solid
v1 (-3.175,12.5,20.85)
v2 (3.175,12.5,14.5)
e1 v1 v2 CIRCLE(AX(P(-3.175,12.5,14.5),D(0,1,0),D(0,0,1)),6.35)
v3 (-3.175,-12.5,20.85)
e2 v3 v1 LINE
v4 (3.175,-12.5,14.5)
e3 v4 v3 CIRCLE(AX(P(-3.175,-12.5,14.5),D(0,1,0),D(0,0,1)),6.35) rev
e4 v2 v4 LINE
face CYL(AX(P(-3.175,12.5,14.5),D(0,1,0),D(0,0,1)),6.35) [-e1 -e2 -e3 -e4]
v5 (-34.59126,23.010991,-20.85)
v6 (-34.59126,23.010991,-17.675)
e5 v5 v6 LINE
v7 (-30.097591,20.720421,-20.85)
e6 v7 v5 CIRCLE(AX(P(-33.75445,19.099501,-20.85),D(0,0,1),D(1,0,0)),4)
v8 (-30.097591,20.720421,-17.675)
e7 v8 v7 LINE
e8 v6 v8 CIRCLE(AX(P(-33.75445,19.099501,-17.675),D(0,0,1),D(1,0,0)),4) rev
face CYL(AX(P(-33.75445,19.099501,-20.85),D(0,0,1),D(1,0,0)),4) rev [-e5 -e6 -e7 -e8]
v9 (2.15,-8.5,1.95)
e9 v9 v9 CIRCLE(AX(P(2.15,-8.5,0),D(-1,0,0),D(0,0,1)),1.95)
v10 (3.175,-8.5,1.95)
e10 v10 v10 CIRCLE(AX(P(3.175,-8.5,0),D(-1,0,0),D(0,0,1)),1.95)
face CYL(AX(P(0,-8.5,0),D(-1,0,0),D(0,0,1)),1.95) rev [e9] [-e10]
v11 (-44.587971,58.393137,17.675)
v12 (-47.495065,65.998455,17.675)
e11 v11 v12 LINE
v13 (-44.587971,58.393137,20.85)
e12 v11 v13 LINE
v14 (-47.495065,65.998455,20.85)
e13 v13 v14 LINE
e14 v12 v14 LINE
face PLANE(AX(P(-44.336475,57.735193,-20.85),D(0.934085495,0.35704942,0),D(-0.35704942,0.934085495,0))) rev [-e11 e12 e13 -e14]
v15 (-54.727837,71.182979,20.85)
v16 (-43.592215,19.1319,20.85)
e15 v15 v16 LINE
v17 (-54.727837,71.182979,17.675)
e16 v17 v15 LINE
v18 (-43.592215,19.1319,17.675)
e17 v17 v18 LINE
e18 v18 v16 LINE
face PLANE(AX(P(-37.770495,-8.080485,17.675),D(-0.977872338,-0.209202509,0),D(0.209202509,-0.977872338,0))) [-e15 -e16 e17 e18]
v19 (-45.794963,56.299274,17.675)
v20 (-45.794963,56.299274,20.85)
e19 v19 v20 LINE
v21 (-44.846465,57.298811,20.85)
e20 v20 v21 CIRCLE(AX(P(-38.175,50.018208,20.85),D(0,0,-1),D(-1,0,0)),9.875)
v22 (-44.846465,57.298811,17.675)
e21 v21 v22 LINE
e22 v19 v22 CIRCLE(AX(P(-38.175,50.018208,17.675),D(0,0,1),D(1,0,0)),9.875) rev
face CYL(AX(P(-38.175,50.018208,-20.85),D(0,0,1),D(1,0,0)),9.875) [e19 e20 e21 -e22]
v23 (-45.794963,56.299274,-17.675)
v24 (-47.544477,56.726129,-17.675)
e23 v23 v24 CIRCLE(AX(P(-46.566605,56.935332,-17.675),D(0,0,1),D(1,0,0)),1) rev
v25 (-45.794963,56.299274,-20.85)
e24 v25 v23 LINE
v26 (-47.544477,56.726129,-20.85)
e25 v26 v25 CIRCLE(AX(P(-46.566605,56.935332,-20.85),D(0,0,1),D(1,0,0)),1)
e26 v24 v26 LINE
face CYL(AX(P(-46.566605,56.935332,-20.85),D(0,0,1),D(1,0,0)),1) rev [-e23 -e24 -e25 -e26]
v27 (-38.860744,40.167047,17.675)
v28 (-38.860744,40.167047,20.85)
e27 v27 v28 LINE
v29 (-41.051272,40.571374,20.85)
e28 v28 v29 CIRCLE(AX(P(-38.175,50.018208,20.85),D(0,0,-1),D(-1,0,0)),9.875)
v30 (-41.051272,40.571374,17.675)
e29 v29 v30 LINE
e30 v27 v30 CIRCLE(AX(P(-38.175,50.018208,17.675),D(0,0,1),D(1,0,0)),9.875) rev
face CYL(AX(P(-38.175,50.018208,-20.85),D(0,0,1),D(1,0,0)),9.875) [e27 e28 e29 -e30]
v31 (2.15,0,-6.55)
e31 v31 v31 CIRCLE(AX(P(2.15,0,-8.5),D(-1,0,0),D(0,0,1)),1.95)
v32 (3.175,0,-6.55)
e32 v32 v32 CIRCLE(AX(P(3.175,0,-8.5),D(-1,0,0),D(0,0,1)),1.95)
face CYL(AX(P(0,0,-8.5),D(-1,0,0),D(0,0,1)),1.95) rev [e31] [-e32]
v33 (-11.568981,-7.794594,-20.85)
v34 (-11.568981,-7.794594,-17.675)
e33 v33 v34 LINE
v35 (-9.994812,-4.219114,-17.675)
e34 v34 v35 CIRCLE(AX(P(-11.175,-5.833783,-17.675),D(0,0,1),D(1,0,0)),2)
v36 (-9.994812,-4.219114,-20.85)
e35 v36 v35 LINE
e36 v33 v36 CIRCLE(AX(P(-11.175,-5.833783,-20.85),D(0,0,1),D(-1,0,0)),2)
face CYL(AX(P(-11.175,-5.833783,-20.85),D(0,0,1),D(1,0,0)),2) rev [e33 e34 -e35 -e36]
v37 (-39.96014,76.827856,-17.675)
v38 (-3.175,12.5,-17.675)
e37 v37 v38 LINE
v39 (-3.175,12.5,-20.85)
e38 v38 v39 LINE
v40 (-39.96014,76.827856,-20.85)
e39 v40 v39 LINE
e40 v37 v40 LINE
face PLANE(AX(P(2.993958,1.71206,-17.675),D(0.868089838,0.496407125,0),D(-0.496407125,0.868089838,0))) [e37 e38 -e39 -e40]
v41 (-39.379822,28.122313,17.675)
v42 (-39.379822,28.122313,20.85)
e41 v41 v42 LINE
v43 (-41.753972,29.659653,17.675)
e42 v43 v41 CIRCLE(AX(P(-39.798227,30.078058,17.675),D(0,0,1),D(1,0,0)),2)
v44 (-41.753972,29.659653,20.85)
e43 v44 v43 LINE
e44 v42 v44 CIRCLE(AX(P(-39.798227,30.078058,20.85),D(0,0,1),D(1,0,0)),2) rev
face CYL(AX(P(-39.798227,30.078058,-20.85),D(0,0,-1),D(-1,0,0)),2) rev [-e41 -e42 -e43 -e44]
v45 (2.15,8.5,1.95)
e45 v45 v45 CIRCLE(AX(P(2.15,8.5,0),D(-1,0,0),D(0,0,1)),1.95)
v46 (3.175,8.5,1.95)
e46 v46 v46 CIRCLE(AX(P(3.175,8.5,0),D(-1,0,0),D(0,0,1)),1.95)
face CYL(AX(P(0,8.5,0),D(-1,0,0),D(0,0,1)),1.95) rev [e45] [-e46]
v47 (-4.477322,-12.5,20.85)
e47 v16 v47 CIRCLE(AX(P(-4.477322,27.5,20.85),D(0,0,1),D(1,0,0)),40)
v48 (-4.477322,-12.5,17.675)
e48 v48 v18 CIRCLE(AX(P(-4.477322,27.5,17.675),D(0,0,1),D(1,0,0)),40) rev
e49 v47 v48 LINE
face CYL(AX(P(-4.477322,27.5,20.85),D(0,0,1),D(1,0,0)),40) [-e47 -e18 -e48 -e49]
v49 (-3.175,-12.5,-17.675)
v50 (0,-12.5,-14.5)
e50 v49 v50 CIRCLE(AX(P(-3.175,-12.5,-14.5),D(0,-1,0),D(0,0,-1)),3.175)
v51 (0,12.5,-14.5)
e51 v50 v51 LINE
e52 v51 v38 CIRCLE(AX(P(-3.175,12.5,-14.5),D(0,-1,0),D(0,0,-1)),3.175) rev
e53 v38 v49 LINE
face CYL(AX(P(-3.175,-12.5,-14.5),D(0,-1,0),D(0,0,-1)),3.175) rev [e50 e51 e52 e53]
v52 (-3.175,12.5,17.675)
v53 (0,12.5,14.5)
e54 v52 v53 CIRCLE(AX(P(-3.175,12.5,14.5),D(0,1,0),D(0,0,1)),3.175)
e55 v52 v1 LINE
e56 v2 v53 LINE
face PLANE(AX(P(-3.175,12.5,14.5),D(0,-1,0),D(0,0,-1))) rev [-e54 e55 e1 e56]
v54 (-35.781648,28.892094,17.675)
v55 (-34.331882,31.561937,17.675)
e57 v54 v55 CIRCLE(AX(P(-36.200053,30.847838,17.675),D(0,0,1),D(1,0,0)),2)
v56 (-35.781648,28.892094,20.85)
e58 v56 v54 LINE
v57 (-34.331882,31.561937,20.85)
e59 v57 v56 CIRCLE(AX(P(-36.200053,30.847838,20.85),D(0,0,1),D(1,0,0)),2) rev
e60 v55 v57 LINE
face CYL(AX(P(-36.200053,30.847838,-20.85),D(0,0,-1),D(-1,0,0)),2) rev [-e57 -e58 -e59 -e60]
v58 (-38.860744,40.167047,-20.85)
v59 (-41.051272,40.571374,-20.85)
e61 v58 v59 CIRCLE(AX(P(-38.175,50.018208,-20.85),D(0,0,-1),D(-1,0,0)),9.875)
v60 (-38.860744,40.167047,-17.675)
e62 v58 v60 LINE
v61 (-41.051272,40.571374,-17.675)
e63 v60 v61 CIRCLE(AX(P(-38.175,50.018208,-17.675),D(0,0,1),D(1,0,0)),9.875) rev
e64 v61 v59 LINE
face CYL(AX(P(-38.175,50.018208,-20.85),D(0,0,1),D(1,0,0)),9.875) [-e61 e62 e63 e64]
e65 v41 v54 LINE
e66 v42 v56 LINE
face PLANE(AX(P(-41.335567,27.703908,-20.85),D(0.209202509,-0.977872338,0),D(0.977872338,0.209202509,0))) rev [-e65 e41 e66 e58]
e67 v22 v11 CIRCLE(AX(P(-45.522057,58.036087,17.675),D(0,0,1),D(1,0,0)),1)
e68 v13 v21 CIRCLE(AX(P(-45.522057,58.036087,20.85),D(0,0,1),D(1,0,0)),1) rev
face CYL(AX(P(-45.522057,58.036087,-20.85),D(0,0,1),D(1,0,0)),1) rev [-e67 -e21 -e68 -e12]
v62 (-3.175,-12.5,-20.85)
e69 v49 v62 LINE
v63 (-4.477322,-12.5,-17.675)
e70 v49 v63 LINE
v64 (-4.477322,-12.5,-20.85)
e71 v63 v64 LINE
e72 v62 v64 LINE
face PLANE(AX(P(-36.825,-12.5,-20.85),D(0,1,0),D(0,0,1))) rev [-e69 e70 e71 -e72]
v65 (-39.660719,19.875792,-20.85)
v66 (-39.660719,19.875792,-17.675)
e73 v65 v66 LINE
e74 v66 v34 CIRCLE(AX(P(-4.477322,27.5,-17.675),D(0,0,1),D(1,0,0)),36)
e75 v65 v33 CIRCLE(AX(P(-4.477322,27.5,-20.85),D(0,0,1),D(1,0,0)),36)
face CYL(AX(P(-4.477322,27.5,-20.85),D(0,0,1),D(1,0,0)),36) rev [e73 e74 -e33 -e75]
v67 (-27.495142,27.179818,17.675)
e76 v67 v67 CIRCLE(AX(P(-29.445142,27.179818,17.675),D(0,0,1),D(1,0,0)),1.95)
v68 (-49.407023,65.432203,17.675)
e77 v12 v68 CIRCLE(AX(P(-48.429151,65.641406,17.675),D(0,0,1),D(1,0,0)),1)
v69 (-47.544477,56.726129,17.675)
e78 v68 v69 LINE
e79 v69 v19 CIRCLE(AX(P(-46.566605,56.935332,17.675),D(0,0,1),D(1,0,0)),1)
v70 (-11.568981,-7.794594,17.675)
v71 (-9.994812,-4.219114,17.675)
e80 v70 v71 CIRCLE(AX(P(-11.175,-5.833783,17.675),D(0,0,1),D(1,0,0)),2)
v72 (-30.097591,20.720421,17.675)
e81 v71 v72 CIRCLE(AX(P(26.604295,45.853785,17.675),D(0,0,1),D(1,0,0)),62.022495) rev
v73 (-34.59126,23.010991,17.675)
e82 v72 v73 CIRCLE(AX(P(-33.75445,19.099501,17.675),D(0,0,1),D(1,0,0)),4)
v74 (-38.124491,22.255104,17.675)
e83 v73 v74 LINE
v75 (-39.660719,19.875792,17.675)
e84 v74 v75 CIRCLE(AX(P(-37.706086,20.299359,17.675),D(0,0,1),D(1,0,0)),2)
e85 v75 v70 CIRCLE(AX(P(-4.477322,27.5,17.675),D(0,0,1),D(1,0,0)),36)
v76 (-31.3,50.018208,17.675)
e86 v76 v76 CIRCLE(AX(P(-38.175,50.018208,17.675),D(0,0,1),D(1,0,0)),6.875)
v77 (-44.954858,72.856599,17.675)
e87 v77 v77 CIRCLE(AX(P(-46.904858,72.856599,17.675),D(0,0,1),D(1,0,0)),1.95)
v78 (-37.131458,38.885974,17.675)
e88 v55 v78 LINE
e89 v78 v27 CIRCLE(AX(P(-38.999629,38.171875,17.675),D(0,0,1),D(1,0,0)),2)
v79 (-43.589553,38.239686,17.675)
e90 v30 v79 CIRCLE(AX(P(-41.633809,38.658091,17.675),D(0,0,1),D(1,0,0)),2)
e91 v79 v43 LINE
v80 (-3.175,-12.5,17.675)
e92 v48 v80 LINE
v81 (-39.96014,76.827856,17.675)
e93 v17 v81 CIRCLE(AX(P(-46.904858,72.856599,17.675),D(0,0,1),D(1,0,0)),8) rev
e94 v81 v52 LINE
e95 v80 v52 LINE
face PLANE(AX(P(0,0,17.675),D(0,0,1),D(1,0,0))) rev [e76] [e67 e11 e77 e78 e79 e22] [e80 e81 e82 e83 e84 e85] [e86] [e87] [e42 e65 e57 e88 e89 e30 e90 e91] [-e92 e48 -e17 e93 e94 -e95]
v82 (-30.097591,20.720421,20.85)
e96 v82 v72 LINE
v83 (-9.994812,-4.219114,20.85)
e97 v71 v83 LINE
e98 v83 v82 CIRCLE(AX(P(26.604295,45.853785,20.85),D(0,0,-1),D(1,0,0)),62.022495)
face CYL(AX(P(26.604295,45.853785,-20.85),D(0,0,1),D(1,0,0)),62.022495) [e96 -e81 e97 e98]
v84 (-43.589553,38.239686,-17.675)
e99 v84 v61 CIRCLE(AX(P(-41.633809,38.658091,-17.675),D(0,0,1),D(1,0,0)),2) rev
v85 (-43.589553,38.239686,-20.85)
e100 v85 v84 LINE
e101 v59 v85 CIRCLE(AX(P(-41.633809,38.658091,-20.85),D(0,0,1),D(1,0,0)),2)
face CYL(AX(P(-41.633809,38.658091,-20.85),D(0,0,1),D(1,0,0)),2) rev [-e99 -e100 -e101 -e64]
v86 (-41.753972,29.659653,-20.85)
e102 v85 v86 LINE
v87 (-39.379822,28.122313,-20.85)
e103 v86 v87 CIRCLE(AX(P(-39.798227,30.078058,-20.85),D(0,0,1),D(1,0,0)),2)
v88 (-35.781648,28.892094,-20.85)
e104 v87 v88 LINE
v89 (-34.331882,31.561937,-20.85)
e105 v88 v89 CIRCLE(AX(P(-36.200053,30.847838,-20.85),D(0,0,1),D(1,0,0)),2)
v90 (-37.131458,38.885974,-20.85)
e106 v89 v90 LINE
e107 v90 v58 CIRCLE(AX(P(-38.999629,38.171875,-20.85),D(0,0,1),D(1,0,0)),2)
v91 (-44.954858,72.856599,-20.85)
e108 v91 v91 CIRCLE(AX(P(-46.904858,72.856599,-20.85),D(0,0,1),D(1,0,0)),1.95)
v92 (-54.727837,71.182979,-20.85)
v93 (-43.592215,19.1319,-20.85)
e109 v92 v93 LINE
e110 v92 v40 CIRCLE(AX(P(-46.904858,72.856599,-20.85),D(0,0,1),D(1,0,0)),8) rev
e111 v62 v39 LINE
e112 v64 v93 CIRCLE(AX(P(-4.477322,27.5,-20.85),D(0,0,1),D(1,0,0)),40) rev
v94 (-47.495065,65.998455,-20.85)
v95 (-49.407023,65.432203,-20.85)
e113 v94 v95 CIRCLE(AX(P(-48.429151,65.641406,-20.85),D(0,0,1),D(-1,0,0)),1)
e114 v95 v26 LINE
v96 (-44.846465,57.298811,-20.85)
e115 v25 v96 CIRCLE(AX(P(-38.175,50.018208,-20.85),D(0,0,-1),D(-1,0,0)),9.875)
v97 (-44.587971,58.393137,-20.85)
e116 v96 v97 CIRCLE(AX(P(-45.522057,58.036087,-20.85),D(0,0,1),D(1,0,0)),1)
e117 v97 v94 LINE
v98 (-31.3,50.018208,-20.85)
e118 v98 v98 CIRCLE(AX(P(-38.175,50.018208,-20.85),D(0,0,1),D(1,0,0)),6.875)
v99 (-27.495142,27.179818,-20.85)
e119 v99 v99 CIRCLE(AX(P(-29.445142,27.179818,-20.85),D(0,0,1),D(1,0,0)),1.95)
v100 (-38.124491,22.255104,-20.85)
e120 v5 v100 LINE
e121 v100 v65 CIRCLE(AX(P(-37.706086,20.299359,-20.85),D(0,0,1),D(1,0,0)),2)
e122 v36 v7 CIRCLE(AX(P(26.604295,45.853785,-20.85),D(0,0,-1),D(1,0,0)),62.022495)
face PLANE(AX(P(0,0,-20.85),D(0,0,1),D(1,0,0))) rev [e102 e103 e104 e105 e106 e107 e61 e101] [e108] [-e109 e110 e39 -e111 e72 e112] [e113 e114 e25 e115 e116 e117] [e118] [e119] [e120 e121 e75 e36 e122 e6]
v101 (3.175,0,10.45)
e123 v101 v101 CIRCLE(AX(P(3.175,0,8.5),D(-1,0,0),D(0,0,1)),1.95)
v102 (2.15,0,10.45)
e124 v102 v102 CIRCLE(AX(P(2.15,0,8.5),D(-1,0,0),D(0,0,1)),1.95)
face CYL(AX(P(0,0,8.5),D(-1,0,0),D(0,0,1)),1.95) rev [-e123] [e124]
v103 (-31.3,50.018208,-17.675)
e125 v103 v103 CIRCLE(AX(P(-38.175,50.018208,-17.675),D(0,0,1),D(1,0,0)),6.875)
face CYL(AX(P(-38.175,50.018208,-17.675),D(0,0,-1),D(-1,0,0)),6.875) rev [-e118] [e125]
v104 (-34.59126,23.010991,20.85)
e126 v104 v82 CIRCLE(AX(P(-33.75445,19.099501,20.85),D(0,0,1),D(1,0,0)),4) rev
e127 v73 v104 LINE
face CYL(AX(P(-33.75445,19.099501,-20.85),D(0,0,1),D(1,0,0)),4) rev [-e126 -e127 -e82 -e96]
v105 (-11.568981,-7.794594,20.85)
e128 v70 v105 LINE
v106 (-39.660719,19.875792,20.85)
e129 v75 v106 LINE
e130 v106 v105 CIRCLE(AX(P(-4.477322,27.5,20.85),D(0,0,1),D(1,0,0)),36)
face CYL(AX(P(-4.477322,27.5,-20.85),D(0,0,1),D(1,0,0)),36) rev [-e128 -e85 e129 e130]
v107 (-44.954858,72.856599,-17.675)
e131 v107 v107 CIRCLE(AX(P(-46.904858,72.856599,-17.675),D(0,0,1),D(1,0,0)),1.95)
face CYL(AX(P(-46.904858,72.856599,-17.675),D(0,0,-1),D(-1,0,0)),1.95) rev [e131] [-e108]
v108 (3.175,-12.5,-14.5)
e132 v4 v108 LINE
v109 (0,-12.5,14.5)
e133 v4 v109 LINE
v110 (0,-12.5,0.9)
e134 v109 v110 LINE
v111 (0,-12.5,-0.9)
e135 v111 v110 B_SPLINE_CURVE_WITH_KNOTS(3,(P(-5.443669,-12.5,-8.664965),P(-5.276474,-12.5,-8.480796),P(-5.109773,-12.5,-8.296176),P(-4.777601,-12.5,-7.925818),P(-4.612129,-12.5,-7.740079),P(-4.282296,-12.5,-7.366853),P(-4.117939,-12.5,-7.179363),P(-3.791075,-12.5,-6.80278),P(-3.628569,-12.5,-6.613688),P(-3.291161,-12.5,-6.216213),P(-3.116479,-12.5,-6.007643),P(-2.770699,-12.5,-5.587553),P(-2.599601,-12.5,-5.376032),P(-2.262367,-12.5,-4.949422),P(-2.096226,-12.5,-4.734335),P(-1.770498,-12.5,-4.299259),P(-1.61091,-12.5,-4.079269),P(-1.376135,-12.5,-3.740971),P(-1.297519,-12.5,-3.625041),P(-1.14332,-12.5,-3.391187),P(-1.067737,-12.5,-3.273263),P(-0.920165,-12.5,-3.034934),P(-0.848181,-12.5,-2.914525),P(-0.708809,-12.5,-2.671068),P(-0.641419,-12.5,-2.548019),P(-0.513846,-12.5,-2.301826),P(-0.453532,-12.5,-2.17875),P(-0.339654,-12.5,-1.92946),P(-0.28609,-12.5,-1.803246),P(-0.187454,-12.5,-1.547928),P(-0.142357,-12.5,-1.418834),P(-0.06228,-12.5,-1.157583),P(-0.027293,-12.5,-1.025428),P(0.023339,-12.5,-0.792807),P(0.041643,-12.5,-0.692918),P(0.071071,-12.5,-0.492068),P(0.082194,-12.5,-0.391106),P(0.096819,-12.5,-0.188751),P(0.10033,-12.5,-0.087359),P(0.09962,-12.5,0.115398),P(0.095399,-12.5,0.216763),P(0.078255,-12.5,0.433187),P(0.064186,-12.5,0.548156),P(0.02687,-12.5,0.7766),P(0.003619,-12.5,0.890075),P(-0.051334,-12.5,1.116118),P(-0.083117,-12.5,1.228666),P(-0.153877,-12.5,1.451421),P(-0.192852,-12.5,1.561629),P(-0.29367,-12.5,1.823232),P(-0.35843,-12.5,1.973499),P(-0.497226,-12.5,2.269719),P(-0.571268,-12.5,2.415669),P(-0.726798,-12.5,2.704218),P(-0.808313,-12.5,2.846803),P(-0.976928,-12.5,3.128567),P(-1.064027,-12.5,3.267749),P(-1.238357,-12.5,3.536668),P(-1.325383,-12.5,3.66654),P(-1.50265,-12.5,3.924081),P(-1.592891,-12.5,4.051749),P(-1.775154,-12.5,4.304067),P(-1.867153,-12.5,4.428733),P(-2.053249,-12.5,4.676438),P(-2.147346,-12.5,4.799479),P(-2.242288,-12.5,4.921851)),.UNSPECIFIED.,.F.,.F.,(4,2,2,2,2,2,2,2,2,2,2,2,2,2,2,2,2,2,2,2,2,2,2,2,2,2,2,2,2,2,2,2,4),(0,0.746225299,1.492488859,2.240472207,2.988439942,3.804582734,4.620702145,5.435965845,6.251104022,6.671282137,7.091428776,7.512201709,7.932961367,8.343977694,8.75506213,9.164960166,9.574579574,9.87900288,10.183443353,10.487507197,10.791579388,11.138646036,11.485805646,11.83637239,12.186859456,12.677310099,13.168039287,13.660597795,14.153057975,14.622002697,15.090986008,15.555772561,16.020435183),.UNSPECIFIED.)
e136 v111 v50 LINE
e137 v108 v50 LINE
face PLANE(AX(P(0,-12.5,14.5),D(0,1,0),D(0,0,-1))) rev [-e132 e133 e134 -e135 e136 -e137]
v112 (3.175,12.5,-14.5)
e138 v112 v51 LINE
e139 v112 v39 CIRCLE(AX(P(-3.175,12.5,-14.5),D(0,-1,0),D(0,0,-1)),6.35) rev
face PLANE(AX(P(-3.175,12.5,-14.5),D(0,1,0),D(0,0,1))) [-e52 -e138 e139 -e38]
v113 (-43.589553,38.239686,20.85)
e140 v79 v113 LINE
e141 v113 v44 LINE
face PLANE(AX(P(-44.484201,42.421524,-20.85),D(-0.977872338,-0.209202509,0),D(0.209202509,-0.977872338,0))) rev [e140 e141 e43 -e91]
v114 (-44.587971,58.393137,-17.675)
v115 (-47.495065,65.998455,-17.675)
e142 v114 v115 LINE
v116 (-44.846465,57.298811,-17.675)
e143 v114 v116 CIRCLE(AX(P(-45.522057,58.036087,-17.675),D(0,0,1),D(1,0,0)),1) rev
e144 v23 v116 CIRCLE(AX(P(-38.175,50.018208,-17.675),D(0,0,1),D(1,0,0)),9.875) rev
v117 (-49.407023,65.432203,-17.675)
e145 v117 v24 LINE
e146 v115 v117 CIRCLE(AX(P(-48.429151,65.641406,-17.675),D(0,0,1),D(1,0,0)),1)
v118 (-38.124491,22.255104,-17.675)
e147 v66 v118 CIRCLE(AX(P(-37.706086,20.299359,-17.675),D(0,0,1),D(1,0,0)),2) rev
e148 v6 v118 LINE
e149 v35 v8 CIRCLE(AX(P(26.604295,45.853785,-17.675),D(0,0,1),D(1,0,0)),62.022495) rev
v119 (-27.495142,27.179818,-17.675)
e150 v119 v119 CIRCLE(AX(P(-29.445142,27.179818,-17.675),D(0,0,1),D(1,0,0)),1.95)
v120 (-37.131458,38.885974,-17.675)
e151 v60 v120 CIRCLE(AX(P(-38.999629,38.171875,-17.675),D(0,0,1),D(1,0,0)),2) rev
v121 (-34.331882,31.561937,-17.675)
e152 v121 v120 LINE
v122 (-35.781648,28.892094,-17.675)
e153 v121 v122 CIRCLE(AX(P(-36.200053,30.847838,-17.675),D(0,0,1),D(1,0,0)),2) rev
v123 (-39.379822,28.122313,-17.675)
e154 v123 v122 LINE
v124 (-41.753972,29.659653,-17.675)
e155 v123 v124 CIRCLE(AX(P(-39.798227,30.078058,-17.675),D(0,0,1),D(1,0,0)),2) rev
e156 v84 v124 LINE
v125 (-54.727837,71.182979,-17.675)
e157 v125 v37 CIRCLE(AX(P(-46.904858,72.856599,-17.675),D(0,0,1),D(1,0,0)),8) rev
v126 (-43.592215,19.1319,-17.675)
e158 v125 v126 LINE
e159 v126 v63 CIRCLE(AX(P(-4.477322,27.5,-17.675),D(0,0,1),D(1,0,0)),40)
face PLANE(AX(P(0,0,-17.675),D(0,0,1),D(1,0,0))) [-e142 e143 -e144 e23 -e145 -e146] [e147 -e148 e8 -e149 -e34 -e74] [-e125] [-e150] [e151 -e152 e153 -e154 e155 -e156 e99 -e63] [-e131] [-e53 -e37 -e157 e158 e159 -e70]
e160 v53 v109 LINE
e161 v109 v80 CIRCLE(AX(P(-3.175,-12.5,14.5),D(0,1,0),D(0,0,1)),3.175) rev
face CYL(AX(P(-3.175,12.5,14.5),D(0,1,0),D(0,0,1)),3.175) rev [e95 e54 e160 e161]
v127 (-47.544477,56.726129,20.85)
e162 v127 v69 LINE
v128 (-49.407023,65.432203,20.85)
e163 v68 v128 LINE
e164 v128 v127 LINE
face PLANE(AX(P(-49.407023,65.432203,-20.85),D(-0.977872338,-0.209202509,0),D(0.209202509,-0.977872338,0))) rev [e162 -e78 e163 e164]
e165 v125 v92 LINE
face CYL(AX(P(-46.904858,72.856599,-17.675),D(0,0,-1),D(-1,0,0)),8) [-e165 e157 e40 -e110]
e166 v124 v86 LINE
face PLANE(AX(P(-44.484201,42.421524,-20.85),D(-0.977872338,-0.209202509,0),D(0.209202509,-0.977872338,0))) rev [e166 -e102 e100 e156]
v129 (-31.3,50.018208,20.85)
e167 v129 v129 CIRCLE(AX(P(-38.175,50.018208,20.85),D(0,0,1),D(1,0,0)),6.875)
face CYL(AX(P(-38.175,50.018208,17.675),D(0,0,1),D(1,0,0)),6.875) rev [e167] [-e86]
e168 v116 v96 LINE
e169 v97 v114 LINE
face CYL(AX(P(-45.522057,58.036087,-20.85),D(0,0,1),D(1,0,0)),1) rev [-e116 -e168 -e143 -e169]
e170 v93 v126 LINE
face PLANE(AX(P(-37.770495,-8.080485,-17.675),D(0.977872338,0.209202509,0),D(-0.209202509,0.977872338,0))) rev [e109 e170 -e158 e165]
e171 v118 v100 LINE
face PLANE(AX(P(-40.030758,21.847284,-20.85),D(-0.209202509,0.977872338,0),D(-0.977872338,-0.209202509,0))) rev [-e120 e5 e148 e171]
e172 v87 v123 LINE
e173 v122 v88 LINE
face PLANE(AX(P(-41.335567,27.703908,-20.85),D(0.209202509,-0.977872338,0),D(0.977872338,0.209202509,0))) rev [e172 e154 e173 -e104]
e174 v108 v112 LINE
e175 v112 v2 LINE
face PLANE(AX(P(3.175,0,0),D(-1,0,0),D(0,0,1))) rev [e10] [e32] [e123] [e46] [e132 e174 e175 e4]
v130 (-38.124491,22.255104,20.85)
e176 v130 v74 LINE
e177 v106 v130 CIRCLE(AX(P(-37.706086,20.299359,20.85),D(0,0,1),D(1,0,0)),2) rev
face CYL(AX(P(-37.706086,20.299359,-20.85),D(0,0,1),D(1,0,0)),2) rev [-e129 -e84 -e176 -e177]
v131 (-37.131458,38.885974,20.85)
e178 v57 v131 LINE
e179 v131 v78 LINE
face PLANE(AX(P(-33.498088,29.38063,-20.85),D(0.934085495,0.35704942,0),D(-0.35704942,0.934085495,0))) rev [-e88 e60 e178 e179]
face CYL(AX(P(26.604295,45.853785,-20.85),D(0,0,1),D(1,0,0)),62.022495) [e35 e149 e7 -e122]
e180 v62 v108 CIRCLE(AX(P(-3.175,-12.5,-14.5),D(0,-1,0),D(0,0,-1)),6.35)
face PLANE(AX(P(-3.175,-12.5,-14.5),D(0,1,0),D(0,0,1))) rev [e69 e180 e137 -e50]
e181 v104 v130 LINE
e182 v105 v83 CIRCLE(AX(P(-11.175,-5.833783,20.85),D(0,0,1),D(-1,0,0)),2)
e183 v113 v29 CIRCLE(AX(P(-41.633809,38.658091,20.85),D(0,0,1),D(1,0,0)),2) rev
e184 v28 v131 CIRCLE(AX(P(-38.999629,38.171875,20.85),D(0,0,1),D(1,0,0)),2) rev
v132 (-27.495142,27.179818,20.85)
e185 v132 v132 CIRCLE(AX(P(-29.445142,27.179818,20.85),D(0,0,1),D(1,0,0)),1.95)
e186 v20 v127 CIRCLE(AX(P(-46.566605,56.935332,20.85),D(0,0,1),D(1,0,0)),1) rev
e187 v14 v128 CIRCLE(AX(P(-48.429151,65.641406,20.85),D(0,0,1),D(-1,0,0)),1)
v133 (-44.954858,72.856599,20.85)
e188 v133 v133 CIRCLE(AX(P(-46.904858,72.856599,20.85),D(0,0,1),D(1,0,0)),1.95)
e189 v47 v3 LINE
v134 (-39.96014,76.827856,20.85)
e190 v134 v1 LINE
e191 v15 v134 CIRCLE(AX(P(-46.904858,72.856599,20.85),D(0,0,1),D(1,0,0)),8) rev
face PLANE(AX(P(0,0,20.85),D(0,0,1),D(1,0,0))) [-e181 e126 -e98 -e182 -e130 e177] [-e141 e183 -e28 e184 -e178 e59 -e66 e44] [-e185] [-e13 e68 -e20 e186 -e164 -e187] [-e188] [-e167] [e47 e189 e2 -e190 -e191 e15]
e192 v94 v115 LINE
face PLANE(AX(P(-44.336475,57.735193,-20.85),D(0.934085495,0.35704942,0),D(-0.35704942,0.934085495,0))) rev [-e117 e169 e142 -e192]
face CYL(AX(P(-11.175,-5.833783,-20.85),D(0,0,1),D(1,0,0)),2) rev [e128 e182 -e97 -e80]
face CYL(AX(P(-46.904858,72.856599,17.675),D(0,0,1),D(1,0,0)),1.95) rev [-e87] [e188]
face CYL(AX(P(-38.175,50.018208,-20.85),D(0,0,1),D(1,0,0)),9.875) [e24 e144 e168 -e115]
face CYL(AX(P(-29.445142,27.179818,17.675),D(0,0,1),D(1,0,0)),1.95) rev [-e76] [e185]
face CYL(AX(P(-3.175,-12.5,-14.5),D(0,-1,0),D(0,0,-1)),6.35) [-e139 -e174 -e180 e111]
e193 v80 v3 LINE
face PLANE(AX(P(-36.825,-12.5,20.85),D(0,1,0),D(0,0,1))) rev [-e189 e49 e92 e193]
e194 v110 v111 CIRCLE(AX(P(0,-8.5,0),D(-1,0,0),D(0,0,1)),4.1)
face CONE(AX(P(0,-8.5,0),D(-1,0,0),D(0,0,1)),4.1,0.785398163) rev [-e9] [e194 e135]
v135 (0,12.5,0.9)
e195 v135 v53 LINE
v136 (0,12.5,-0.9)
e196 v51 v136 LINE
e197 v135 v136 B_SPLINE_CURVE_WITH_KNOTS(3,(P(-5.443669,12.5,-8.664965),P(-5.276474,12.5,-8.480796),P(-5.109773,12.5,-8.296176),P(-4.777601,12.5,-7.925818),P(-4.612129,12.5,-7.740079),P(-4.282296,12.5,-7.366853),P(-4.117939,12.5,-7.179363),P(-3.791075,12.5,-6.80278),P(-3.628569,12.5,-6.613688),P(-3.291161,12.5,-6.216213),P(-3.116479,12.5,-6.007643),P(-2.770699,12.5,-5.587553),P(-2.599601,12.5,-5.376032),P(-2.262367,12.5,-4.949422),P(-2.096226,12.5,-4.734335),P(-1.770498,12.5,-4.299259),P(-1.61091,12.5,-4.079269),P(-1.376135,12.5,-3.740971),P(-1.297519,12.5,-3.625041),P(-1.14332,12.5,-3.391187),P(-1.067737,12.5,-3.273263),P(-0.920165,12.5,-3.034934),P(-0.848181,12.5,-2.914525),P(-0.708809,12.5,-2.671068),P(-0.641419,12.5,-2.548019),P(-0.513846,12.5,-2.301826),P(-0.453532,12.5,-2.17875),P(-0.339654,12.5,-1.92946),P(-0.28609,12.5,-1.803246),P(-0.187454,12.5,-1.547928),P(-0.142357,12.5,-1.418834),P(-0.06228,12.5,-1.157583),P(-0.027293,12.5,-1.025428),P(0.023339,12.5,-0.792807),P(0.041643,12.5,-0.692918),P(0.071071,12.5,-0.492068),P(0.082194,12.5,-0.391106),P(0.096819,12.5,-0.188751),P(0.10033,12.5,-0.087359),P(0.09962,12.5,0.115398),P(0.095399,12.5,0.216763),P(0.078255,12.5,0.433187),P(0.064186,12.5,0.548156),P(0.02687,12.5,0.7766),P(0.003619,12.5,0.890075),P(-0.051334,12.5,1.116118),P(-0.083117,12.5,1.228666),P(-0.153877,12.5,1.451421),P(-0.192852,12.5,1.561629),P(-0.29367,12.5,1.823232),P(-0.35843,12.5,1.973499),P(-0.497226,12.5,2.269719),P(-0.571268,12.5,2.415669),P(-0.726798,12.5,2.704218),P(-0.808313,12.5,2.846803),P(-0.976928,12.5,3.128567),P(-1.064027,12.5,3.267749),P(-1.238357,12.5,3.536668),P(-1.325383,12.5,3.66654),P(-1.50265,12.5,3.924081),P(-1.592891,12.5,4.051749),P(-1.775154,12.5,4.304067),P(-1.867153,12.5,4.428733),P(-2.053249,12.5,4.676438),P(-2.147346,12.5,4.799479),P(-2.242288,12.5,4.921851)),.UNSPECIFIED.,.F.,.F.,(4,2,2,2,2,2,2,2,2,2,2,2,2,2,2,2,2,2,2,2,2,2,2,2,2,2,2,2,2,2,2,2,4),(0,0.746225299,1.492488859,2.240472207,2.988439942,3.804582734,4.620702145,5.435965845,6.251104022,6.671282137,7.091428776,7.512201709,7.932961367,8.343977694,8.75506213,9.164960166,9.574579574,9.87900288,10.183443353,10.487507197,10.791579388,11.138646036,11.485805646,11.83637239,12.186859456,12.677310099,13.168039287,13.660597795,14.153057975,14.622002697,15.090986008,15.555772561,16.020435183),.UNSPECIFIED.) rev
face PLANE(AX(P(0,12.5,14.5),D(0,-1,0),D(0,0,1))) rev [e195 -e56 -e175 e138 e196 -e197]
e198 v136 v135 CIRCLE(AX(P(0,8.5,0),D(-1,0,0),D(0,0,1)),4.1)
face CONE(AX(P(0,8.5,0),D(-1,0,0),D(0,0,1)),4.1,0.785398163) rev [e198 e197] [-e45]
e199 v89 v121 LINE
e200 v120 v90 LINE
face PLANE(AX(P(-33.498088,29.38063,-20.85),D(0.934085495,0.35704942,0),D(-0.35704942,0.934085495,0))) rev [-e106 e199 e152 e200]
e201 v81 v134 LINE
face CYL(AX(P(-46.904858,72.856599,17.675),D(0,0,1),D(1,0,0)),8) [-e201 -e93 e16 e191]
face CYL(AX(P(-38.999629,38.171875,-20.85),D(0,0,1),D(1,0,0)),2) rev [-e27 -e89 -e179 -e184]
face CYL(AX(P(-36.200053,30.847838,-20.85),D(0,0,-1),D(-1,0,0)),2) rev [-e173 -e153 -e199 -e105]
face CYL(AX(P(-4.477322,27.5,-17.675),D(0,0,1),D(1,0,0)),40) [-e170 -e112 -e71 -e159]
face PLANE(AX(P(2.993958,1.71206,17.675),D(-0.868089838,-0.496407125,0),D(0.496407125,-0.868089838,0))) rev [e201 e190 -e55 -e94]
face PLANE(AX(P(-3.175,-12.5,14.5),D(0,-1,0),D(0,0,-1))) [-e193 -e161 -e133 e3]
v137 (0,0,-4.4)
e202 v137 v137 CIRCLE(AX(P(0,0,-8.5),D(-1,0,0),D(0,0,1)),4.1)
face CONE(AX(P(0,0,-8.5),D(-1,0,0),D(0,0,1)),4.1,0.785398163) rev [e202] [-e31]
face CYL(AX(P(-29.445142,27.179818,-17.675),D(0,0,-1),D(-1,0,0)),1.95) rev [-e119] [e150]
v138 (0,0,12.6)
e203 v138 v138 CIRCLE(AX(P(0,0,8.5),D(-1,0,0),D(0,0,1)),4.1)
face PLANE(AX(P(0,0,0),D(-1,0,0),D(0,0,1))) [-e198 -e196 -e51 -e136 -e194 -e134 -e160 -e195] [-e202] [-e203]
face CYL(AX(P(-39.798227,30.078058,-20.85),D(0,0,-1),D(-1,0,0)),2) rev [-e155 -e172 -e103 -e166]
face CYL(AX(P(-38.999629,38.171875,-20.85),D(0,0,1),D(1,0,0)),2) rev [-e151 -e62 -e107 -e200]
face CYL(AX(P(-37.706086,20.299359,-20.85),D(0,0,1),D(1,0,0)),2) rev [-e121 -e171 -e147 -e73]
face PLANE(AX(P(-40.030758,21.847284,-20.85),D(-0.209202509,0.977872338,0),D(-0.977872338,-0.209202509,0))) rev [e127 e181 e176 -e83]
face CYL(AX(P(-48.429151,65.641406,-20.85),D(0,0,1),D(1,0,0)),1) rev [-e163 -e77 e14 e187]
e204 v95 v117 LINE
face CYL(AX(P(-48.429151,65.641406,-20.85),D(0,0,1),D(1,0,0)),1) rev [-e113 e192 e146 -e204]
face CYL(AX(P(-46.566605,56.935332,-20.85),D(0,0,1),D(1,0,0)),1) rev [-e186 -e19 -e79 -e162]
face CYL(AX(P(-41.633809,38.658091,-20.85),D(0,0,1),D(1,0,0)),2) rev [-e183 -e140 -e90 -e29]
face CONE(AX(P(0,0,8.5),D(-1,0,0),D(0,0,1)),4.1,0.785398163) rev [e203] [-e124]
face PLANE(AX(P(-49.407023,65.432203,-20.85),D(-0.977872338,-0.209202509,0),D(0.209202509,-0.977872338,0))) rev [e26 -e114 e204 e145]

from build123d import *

# Parameters (mm, degrees)
SKETCH2_W                                      = 29
SKETCH2_H                                      = 25
BOSS_EXTRUDE1_DEPTH                            = 6.35
CONVERT_SOLID1_START                           = 3.175
CONVERT_SOLID1_OUTLINE_W                       = 25
CONVERT_SOLID1_OUTLINE_H                       = 29
CONVERT_SOLID1_DEPTH                           = 3.175
CSK_FOR_M3_5_FLAT_HEAD_MACHINE_SCREW1_AT_COUNT = 2
CSK_FOR_M3_5_FLAT_HEAD_MACHINE_SCREW1_AT_PITCH = 12.02081528
CSK_FOR_M3_5_FLAT_HEAD_MACHINE_SCREW_2_COUNT   = 2
CSK_FOR_M3_5_FLAT_HEAD_MACHINE_SCREW_2_PITCH   = 17
CSK_FOR_M3_5_FLAT_HEAD_MACHINE_SCREW_3_COUNT   = 2
CSK_FOR_M3_5_FLAT_HEAD_MACHINE_SCREW_3_PITCH   = 12.02081528
EDGE_FLANGE1_DEPTH                             = 25
EDGE_FLANGE1_BEND_DEPTH                        = 25
SKETCH23_R                                     = 1.95
SKETCH23_R_2                                   = 6.875
BOSS_EXTRUDE2_DEPTH                            = 3.175
FILLET1_R                                      = 40
SKETCH25_R                                     = 1.95
SKETCH25_R_2                                   = 6.875
CUT_EXTRUDE3_DEPTH                             = 107.260166637
FILLET2_R                                      = 2
FILLET3_R                                      = 4
FILLET4_R                                      = 1


with BuildPart() as part:
    # Sketch2 → Boss-Extrude1 (new body)
    with BuildSketch(Plane(origin=(0, 0, 0), x_dir=(0, 0, -1), z_dir=(1, 0, 0))):
        Rectangle(SKETCH2_W, SKETCH2_H)
    extrude(amount=BOSS_EXTRUDE1_DEPTH)

    # Convert-Solid1: read off the stored shape, not the designer's step
    # Convert-Solid1 outline → Convert-Solid1 (cut)
    with BuildSketch(Plane.YZ.offset(CONVERT_SOLID1_START)):
        Rectangle(CONVERT_SOLID1_OUTLINE_W, CONVERT_SOLID1_OUTLINE_H)
    extrude(amount=CONVERT_SOLID1_DEPTH, mode=Mode.SUBTRACT)

    # Sketch4 → CSK for M3.5 Flat Head Machine Screw1 (revolve, cut)
    with BuildSketch(Plane.ZX.offset(-8.5)):
        Polygon((0, 0), (0, 3.175), (1.95, 3.175), (1.95, 2.15), (4.1, 0), align=None)
    csk_for_m3_5_flat_head_machine_screw1 = revolve(axis=Axis((-6.35, -8.5, 0), (1, 0, 0)), mode=Mode.SUBTRACT)

    # CSK for M3.5 Flat Head Machine Screw1 at: CSK for M3.5 Flat Head Machine Screw1 ×2
    with Locations(*[Vector(0, 0.7071067811865476, 0.7071067811865476) * (i * CSK_FOR_M3_5_FLAT_HEAD_MACHINE_SCREW1_AT_PITCH) for i in range(1, CSK_FOR_M3_5_FLAT_HEAD_MACHINE_SCREW1_AT_COUNT)]):
        add(csk_for_m3_5_flat_head_machine_screw1, mode=Mode.SUBTRACT)

    # CSK for M3.5 Flat Head Machine Screw 2: CSK for M3.5 Flat Head Machine Screw1 ×2
    with Locations(*[(0, i * CSK_FOR_M3_5_FLAT_HEAD_MACHINE_SCREW_2_PITCH, 0) for i in range(1, CSK_FOR_M3_5_FLAT_HEAD_MACHINE_SCREW_2_COUNT)]):
        add(csk_for_m3_5_flat_head_machine_screw1, mode=Mode.SUBTRACT)

    # CSK for M3.5 Flat Head Machine Screw 3: CSK for M3.5 Flat Head Machine Screw1 ×2
    with Locations(*[Vector(0, 0.7071067811865476, -0.7071067811865476) * (i * CSK_FOR_M3_5_FLAT_HEAD_MACHINE_SCREW_3_PITCH) for i in range(1, CSK_FOR_M3_5_FLAT_HEAD_MACHINE_SCREW_3_COUNT)]):
        add(csk_for_m3_5_flat_head_machine_screw1, mode=Mode.SUBTRACT)

    # Edge-Flange1: sheet metal written as solids
    # Edge-Flange1 section (on a plane across the edge) → Edge-Flange1 (add)
    with BuildSketch(Plane(origin=(0, 12.5, -17.675), x_dir=(0, 0, 1), z_dir=(0, -1, 0))):
        with BuildLine():
            Line((-3.175, 3.175), (-3.175, 36.825))
            Line((-3.175, 36.825), (0, 36.825))
            Line((0, 36.825), (0, 3.175))
            ThreePointArc((0, 3.175), (0.92993597, 0.92993597), (3.175, 0))
            Line((3.175, 0), (3.175, -3.175))
            ThreePointArc((3.175, -3.175), (-1.315128061, -1.315128061), (-3.175, 3.175))
        make_face()
    extrude(amount=EDGE_FLANGE1_DEPTH)

    # Edge-Flange1 section 2 (on a plane across the edge) → Edge-Flange1 bend (add)
    with BuildSketch(Plane(origin=(0, -12.5, 17.675), x_dir=(0, 0, -1), z_dir=(0, 1, 0))):
        with BuildLine():
            Line((-3.175, 3.175), (-3.175, 36.825))
            Line((-3.175, 36.825), (0, 36.825))
            Line((0, 36.825), (0, 3.175))
            ThreePointArc((0, 3.175), (0.92993597, 0.92993597), (3.175, 0))
            Line((3.175, 0), (3.175, -3.175))
            ThreePointArc((3.175, -3.175), (-1.315128061, -1.315128061), (-3.175, 3.175))
        make_face()
    extrude(amount=EDGE_FLANGE1_BEND_DEPTH)

    # Sketch23 → Boss-Extrude2 (add)
    with BuildSketch(Plane.XY.offset(20.85)):
        with BuildLine():
            Line((-3.175, -12.5), (-3.175, 12.5))
            Line((-3.175, 12.5), (-39.960139618, 76.827855658))
            ThreePointArc((-39.960139618, 76.827855658), (-49.76125368, 80.329282617), (-54.727837027, 71.182978584))
            Line((-54.727837027, 71.182978584), (-36.825, -12.5))
            Line((-36.825, -12.5), (-3.175, -12.5))
        make_face()
        with Locations((-46.90485832, 72.856598659)):
            Circle(SKETCH23_R, mode=Mode.SUBTRACT)
        with Locations((-29.44514168, 27.179817962)):
            Circle(SKETCH23_R, mode=Mode.SUBTRACT)
        with Locations((-38.175, 50.01820831)):
            Circle(SKETCH23_R_2, mode=Mode.SUBTRACT)
    boss_extrude2 = extrude(amount=-BOSS_EXTRUDE2_DEPTH)

    # Mirror3: Boss-Extrude2 across plane
    add(boss_extrude2.mirror(Plane.XY))

    # Fillet1
    fillet1_edges = [part.edges().sort_by_distance(p)[0] for p in [
        (-36.825, -12.5, -19.2625),
        (-36.825, -12.5, 19.2625),
    ]]
    fillet(fillet1_edges, radius=FILLET1_R)

    # Sketch25 → Cut-Extrude3 (cut, through all)
    with BuildSketch(Plane.XY.offset(20.85)):
        with Locations((-46.90485832, 72.856598659)):
            Circle(SKETCH25_R)
        with Locations((-38.175, 50.01820831)):
            Circle(SKETCH25_R_2)
        with Locations((-29.44514168, 27.179817962)):
            Circle(SKETCH25_R)
        with BuildLine():
            Line((-40.030757762, 21.847284007), (-31.33001784, 23.708689176))
            ThreePointArc((-31.33001784, 23.708689176), (-22.681934441, 8.20199276), (-9.994811851, -4.219114299))
            ThreePointArc((-9.994811851, -4.219114299), (-9.344550797, -6.639671437), (-11.568981065, -7.794594065))
            ThreePointArc((-11.568981065, -7.794594065), (-30.444825945, 2.56631328), (-40.030757762, 21.847284007))
        make_face()
        with BuildLine():
            Line((-33.498088379, 29.38063017), (-37.618037608, 40.15892751))
            ThreePointArc((-37.618037608, 40.15892751), (-41.265614485, 40.639310342), (-44.484200888, 42.42152422))
            Line((-44.484200888, 42.42152422), (-41.335566751, 27.703908089))
            Line((-41.335566751, 27.703908089), (-33.498088379, 29.38063017))
        make_face()
        with BuildLine():
            Line((-44.336475361, 57.73519259), (-47.495065423, 65.998455308))
            ThreePointArc((-47.495065423, 65.998455308), (-48.713122103, 66.600238702), (-49.407023256, 65.432203379))
            Line((-49.407023256, 65.432203379), (-47.040106009, 54.368555475))
            ThreePointArc((-47.040106009, 54.368555475), (-45.874551823, 56.201453956), (-44.336475361, 57.73519259))
        make_face()
    extrude(amount=-CUT_EXTRUDE3_DEPTH, mode=Mode.SUBTRACT)

    # Fillet2
    fillet2_edges = [part.edges().sort_by_distance(p)[0] for p in [
        (-40.030757762, 21.847284007, 19.2625),
        (-40.030757762, 21.847284007, -19.2625),
        (-33.498088379, 29.38063017, 19.2625),
        (-41.335566751, 27.703908089, 19.2625),
        (-44.484200888, 42.42152422, 19.2625),
        (-37.618037608, 40.15892751, 19.2625),
        (-33.498088379, 29.38063017, -19.2625),
        (-41.335566751, 27.703908089, -19.2625),
        (-44.484200888, 42.42152422, -19.2625),
        (-37.618037608, 40.15892751, -19.2625),
    ]]
    fillet(fillet2_edges, radius=FILLET2_R)

    # Fillet3
    fillet3_edges = [part.edges().sort_by_distance(p)[0] for p in [
        (-31.33001784, 23.708689176, 19.2625),
        (-31.33001784, 23.708689176, -19.2625),
    ]]
    fillet(fillet3_edges, radius=FILLET3_R)

    # Fillet4
    fillet4_edges = [part.edges().sort_by_distance(p)[0] for p in [
        (-44.336475361, 57.73519259, 19.2625),
        (-47.040106009, 54.368555475, 19.2625),
        (-44.336475361, 57.73519259, -19.2625),
        (-47.040106009, 54.368555475, -19.2625),
    ]]
    fillet(fillet4_edges, radius=FILLET4_R)


solid = part.part
